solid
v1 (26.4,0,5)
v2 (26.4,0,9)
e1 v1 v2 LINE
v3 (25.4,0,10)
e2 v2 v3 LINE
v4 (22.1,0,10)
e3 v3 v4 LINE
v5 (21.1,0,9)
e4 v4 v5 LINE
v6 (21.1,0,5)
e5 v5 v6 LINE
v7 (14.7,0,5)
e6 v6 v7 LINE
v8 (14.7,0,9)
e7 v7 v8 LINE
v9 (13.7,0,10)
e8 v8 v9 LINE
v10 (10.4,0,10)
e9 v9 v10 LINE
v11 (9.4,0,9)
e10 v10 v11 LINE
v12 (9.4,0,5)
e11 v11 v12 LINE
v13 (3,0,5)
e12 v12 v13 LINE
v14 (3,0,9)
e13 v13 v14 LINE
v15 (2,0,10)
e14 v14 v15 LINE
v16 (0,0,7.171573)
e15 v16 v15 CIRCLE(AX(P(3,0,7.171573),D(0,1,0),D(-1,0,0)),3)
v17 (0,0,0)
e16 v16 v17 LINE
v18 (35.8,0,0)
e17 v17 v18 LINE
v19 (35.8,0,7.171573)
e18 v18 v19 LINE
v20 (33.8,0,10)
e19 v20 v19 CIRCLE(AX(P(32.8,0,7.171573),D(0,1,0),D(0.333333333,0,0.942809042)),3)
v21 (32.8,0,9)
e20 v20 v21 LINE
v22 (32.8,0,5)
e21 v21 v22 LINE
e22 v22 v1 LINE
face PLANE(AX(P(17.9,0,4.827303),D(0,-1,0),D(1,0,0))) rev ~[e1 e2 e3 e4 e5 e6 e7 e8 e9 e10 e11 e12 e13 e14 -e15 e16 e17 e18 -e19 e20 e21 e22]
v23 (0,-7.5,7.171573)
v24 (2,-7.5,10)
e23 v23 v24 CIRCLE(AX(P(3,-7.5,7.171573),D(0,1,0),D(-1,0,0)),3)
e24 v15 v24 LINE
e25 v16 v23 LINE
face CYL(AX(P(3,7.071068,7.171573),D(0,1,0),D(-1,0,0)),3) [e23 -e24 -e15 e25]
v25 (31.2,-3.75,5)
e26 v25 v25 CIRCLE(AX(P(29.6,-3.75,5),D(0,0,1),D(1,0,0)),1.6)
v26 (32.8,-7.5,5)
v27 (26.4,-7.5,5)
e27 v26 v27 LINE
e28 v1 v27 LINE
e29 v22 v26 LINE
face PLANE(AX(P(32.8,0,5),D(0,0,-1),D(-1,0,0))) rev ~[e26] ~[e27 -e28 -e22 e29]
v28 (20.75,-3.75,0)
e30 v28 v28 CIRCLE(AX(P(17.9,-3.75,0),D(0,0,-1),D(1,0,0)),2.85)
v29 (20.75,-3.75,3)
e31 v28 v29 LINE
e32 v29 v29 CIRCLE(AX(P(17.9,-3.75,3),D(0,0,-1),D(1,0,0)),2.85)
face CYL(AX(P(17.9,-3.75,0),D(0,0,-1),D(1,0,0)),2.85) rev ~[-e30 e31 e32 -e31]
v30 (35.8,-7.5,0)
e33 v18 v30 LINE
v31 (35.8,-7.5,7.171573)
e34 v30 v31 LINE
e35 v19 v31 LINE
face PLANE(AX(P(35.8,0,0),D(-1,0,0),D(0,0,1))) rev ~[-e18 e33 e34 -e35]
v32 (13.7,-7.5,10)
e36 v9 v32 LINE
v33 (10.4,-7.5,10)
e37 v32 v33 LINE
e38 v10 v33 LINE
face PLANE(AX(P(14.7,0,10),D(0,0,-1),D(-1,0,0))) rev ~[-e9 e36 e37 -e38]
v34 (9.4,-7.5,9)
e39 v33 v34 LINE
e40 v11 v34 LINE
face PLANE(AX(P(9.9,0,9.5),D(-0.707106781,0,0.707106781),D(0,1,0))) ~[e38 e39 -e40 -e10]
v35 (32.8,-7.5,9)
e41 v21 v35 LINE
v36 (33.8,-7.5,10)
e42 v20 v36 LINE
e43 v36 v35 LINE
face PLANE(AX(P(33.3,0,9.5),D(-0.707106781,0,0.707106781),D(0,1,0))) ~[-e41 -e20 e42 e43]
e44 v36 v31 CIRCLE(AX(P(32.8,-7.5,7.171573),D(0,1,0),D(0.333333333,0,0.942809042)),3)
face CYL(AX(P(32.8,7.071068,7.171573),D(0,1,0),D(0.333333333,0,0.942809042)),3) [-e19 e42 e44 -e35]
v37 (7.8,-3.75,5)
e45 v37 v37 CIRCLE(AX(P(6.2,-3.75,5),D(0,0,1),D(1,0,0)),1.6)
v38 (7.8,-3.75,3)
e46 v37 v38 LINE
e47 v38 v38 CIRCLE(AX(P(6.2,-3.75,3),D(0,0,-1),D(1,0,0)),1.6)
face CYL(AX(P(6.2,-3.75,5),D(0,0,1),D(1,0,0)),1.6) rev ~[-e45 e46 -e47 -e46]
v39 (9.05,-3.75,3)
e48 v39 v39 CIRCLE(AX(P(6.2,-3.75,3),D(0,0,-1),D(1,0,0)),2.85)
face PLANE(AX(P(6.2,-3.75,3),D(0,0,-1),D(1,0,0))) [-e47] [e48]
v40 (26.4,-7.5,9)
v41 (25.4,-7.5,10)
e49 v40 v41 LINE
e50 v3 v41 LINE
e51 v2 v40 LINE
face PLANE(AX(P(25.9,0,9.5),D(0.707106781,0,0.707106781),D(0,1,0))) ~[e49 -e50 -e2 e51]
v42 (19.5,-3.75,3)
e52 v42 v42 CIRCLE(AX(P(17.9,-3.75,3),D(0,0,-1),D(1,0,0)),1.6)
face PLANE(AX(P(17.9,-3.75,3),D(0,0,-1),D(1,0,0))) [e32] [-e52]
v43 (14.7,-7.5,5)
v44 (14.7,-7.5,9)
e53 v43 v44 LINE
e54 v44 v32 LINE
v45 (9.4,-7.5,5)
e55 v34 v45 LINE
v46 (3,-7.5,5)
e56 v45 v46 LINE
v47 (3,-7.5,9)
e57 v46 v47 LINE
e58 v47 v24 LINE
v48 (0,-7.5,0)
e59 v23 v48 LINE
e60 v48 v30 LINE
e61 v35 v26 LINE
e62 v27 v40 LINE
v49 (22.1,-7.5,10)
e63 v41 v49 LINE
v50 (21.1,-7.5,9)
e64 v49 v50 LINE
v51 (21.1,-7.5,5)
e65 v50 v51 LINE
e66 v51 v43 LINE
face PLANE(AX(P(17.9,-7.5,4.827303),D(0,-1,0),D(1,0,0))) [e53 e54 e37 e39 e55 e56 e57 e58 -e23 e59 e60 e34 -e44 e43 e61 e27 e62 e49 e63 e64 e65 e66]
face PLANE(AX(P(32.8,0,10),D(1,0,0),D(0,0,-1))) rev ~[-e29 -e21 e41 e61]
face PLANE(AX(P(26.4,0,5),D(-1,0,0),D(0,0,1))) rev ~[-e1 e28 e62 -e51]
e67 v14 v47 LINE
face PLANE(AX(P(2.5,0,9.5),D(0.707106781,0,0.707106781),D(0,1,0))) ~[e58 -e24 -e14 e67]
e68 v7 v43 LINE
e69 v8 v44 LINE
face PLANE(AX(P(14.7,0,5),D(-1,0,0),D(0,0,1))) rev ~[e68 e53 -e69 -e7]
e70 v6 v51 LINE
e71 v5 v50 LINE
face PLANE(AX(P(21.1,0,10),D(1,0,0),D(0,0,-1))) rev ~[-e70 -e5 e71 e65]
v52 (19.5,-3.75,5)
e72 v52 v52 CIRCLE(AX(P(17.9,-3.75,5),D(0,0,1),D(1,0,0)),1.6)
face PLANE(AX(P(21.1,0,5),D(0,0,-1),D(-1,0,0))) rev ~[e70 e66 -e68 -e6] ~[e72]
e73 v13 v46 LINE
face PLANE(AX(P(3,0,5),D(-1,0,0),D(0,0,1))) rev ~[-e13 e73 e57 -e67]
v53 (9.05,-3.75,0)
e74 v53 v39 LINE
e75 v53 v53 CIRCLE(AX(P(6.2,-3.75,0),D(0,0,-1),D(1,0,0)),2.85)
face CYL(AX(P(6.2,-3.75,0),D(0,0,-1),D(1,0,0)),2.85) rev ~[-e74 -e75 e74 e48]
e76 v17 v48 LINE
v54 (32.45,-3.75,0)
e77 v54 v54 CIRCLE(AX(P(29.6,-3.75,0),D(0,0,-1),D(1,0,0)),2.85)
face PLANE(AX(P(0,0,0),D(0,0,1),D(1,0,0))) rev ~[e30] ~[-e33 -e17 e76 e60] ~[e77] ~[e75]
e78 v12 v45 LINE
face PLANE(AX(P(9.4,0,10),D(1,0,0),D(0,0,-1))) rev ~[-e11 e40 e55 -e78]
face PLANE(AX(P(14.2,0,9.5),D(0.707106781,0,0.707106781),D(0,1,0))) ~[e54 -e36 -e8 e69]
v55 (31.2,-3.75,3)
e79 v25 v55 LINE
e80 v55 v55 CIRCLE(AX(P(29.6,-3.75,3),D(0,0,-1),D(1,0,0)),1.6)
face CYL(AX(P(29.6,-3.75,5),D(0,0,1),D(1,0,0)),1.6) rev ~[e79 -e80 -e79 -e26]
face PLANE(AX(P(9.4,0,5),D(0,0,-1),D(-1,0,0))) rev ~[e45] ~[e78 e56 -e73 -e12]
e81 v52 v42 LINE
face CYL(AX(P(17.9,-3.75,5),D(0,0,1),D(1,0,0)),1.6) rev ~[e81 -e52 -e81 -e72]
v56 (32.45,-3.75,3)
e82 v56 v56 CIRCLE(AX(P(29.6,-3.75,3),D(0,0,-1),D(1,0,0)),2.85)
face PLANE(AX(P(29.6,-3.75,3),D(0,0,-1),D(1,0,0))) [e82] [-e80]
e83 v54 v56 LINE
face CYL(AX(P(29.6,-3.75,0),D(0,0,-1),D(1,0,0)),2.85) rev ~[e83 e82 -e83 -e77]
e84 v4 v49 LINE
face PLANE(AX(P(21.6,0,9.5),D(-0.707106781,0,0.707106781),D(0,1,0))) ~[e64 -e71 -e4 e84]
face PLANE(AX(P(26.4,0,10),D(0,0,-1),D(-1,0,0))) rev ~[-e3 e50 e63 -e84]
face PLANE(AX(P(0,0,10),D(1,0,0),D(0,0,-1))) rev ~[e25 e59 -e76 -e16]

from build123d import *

# Parameters (mm, degrees)
F1_DEPTH    = 7.5
F2_SIZE     = 1
F3_T1_DEPTH = 21.6421356237
F4_R        = 1.6
F5_DEPTH    = 5.001
F6_R        = 1.6
F7_DEPTH    = 5.001
F8_R        = 1.6
F9_DEPTH    = 5.001
F10_R       = 2.85
F10_R_2     = 1.6
F11_DEPTH   = 3


# Not quite as in the source:
# - a fillet or chamfer that OpenCascade refuses, or shapes differently, is made with other operations: its cross-section is extruded or revolved along the edge and cut away or added


with BuildPart() as f1:
    # F0 (on Front) → F1 (new body)
    with BuildSketch(Plane.XZ):
        Polygon((0, 10), (0, 0), (35.8, 0), (35.8, 10), (32.8, 10), (32.8, 5), (26.4, 5), (26.4, 10), (21.1, 10), (21.1, 5), (14.7, 5), (14.7, 10), (9.4, 10), (9.4, 5), (3, 5), (3, 10), align=None)
    extrude(amount=F1_DEPTH)

    # F2
    f2_edges = [f1.edges().sort_by_distance(p)[0] for p in [
        (3, -3.75, 10),
        (9.4, -3.75, 10),
        (14.7, -3.75, 10),
        (21.1, -3.75, 10),
        (26.4, -3.75, 10),
        (32.8, -3.75, 10),
    ]]
    chamfer(f2_edges, length=F2_SIZE)

    # F3: fillet of radius 3 on 2 edges, made by hand

    # F3_s2 → F3_t1 (cut)
    with BuildSketch(Plane.XZ.offset(-7.0710678119)):
        with BuildLine():
            ThreePointArc((0, 7.1715728753), (0.5505102572, 8.9036236828), (2, 10))
            Line((2, 10), (0, 10))
            Line((0, 10), (0, 7.1715728753))
        make_face()
        with BuildLine():
            ThreePointArc((33.8, 10), (35.2494897428, 8.9036236828), (35.8, 7.1715728753))
            Line((35.8, 7.1715728753), (35.8, 10))
            Line((35.8, 10), (33.8, 10))
        make_face()
    extrude(amount=F3_T1_DEPTH, mode=Mode.SUBTRACT)

    # F4 (on face) → F5 (cut, through all)
    with BuildSketch(Plane.XY.offset(5)):
        with Locations((6.2, -3.75)):
            Circle(F4_R)
    extrude(amount=-F5_DEPTH, mode=Mode.SUBTRACT)

    # F6 (on face) → F7 (cut, through all)
    with BuildSketch(Plane.XY.offset(5)):
        with Locations((17.9, -3.75)):
            Circle(F6_R)
    extrude(amount=-F7_DEPTH, mode=Mode.SUBTRACT)

    # F8 (on face) → F9 (cut, through all)
    with BuildSketch(Plane.XY.offset(5)):
        with Locations((29.6, -3.75)):
            Circle(F8_R)
    extrude(amount=-F9_DEPTH, mode=Mode.SUBTRACT)

    # F10 (on face) → F11 (cut)
    with BuildSketch(Plane(origin=(0, 0, 0), x_dir=(1, 0, 0), z_dir=(0, 0, -1))):
        with Locations((6.2, 3.75)):
            Circle(F10_R)
        with Locations((6.2, 3.75)):
            Circle(F10_R_2, mode=Mode.SUBTRACT)
        with Locations((17.9, 3.75)):
            Circle(F10_R)
        with Locations((17.9, 3.75)):
            Circle(F10_R_2, mode=Mode.SUBTRACT)
        with Locations((29.6, 3.75)):
            Circle(F10_R)
        with Locations((29.6, 3.75)):
            Circle(F10_R_2, mode=Mode.SUBTRACT)
    extrude(amount=-F11_DEPTH, mode=Mode.SUBTRACT)


solid = f1.part
